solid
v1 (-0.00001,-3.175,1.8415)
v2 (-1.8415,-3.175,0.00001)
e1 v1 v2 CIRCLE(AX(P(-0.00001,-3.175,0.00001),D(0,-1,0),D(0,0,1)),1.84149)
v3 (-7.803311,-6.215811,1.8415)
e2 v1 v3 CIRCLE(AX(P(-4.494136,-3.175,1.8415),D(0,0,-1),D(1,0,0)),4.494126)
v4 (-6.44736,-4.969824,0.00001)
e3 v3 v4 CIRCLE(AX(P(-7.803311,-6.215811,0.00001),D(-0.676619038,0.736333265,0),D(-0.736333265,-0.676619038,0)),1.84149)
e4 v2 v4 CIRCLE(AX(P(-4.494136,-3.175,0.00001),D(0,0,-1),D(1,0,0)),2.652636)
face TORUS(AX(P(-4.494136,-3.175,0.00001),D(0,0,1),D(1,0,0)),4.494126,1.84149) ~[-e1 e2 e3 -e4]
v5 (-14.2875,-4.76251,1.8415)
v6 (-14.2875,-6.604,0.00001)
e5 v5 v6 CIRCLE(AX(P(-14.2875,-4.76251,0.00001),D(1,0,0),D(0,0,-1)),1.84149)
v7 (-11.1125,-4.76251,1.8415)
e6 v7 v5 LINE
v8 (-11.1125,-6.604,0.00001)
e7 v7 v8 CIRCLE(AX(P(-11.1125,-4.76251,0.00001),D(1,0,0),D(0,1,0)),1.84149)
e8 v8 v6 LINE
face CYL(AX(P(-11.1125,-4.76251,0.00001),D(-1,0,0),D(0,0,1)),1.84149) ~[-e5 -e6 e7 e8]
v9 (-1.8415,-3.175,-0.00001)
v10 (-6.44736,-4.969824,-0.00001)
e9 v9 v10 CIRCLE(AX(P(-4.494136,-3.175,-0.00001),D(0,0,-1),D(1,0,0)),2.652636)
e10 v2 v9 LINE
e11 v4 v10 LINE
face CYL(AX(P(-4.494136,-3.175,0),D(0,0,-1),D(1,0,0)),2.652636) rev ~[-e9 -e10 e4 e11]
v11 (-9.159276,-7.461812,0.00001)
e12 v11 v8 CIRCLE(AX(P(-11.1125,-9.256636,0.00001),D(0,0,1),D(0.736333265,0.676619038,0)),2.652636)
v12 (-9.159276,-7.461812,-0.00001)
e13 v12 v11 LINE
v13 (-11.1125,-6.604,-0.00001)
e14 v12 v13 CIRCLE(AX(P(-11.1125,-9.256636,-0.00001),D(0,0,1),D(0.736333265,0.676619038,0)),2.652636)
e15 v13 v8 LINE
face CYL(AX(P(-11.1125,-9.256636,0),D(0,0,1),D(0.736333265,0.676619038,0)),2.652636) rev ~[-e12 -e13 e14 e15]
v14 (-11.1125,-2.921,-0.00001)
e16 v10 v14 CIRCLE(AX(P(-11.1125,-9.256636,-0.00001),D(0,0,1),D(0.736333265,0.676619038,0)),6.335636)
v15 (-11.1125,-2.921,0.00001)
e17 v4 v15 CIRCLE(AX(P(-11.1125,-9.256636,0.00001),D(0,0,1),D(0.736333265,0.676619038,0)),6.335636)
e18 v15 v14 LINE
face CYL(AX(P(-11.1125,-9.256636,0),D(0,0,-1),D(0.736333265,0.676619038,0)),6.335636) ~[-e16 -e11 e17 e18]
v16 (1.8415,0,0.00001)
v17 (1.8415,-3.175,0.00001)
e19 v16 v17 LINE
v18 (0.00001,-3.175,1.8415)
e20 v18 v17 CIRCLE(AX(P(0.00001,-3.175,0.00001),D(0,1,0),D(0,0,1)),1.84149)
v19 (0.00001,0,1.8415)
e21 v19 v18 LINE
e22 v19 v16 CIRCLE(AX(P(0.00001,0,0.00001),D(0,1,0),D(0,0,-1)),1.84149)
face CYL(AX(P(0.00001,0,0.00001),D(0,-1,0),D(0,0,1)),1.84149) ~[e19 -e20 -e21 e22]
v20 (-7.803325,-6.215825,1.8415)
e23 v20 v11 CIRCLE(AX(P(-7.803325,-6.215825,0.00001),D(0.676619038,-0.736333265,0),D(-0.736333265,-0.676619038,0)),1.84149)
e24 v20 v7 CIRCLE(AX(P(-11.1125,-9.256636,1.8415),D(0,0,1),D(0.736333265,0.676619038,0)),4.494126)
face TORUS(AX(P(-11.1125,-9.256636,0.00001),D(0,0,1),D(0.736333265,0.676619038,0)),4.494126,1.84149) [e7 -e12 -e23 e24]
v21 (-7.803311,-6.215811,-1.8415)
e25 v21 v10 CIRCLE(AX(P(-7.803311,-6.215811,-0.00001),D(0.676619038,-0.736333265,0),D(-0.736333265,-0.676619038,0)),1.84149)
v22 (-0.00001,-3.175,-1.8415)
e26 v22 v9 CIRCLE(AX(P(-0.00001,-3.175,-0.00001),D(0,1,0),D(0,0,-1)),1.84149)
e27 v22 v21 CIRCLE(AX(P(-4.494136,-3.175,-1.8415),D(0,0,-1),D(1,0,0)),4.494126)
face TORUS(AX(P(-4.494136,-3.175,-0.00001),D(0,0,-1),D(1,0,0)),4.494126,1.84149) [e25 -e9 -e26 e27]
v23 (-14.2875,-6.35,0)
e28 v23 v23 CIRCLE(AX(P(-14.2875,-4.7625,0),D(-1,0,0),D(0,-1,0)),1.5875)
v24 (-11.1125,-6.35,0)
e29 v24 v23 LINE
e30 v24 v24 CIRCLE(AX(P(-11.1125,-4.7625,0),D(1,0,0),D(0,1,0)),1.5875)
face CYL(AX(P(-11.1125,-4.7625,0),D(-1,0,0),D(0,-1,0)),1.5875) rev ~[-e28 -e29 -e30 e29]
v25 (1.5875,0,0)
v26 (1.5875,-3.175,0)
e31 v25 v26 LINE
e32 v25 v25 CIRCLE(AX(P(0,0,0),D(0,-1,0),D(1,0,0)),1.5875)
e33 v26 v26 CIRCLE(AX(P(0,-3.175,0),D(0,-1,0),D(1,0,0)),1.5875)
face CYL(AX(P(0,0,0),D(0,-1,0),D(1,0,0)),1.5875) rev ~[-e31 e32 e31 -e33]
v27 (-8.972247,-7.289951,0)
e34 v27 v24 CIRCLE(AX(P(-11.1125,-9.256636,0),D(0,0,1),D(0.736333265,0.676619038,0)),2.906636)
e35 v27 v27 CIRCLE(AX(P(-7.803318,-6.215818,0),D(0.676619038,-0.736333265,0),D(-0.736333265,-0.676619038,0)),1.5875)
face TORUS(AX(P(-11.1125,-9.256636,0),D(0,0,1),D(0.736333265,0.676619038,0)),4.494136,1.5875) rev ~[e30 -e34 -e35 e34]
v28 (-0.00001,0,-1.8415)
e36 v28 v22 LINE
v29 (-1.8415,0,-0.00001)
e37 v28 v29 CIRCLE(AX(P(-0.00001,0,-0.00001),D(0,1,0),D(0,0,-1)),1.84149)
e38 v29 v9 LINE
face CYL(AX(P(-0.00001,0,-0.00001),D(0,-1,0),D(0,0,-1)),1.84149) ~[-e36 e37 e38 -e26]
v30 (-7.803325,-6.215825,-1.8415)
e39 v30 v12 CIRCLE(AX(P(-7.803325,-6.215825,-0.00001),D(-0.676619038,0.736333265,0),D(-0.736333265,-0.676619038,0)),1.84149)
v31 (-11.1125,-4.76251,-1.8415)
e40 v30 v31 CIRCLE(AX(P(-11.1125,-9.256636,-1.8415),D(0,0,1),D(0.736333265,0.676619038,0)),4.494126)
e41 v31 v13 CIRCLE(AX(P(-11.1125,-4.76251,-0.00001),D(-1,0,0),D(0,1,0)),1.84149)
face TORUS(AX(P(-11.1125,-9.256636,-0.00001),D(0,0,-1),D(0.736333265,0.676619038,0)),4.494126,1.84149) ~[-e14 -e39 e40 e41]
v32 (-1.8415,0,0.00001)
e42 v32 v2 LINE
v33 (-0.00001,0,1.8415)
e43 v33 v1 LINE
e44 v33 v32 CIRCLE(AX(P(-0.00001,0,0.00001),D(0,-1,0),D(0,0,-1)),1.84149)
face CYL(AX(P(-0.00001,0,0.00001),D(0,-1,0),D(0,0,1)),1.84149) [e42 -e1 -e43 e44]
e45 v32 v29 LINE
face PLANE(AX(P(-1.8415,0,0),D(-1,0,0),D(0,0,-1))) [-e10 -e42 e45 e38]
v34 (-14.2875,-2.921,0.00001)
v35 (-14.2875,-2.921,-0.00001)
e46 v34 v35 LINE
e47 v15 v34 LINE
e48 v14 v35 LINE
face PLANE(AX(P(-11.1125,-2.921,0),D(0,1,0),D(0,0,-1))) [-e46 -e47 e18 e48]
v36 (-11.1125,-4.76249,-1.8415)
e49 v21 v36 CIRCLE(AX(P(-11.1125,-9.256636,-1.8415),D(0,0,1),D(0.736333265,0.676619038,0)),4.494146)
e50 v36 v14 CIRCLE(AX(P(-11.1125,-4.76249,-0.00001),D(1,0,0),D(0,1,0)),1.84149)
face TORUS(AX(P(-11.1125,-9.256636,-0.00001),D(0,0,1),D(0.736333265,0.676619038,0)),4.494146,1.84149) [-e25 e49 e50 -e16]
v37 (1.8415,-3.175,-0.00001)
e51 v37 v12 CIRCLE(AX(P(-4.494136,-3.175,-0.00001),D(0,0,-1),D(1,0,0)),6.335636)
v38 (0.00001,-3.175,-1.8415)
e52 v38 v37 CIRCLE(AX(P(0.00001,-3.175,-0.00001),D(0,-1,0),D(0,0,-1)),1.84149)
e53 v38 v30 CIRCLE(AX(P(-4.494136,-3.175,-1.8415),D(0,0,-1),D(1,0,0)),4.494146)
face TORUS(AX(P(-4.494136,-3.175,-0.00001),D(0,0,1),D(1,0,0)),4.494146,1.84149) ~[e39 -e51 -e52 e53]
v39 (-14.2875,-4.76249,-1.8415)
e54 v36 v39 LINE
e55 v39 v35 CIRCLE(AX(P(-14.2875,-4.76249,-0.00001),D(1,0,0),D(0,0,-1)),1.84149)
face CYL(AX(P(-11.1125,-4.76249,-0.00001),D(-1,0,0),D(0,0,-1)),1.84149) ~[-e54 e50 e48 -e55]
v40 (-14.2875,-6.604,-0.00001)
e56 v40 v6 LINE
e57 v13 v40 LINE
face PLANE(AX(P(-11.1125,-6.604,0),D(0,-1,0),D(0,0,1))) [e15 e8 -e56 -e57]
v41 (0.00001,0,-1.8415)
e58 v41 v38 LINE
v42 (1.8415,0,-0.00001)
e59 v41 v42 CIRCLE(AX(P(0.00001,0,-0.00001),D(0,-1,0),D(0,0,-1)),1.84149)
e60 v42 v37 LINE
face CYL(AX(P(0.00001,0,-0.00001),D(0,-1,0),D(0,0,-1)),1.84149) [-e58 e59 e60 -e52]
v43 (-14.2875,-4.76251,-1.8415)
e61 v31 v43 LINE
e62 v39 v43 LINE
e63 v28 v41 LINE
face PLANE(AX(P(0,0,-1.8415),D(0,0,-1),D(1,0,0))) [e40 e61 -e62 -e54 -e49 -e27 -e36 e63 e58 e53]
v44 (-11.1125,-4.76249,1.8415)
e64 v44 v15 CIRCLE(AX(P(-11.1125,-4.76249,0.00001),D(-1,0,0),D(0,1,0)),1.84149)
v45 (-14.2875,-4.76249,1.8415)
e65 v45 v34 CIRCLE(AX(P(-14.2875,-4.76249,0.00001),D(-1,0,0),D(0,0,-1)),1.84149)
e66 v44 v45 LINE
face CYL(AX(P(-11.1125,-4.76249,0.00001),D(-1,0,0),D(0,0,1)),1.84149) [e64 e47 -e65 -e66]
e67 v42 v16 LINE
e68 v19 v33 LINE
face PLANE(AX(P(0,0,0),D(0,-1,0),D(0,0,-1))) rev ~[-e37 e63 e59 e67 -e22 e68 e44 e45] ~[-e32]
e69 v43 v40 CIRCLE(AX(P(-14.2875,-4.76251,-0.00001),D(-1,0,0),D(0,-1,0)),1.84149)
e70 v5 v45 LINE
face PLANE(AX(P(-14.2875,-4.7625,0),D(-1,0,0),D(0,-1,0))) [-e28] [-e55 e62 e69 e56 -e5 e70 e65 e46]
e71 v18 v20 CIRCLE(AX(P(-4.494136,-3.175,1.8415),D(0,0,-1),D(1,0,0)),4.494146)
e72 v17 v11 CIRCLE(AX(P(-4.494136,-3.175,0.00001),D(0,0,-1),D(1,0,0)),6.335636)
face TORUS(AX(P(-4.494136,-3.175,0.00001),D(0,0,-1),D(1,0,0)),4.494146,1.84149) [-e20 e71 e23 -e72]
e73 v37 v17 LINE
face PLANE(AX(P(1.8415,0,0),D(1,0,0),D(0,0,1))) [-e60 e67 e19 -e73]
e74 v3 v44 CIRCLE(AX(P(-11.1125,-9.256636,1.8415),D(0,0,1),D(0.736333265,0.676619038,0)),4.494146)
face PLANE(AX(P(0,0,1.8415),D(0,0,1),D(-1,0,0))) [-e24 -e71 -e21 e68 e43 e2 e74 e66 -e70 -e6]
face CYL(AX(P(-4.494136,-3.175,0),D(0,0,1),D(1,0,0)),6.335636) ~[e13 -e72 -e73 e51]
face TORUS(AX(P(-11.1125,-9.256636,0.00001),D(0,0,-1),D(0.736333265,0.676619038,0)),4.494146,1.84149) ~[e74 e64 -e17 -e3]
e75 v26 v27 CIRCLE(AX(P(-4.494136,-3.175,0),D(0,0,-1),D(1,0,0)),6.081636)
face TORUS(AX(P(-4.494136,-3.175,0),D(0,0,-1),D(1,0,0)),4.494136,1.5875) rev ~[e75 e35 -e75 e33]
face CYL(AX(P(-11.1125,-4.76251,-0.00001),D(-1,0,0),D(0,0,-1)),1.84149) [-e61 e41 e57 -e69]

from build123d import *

# Parameters (mm, degrees)
F1_W = 3.683
F1_H = 3.683
F1_R = 1.5875
F3_R = 1.84149


# Not quite as in the source:
# - a fillet or chamfer is up to 0.001 mm smaller than in the source, because OpenCascade refuses the exact size


with BuildPart() as f2:
    # F2: sweep along a path in F0
    with BuildLine(Plane.XY) as f2_path:
        Line((0, 0), (0, -3.175))
        ThreePointArc((0, -3.175), (-2.8623663141, -7.3624320102), (-7.8033180665, -6.2158180665))
        ThreePointArc((-7.8033180665, -6.2158180665), (-9.3053739342, -5.1418390585), (-11.1125, -4.7625))
        Line((-11.1125, -4.7625), (-14.2875, -4.7625))
    # F1 (on Front) → F2 (sweep)
    with BuildSketch(Plane.XZ):
        Rectangle(F1_W, F1_H)
        Circle(F1_R, mode=Mode.SUBTRACT)
    sweep(path=f2_path.line)

    # F3 (radius 1.8415 in the source; OpenCascade refuses exactly that, so slightly less here)
    f3_edges = [f2.edges().sort_by_distance(p)[0] for p in [
        (-12.7, -6.604, -1.8415),
        (-12.7, -6.604, 1.8415),
        (-12.7, -2.921, 1.8415),
        (-12.7, -2.921, -1.8415),
    ]]
    fillet(f3_edges, radius=F3_R)


solid = f2.part
